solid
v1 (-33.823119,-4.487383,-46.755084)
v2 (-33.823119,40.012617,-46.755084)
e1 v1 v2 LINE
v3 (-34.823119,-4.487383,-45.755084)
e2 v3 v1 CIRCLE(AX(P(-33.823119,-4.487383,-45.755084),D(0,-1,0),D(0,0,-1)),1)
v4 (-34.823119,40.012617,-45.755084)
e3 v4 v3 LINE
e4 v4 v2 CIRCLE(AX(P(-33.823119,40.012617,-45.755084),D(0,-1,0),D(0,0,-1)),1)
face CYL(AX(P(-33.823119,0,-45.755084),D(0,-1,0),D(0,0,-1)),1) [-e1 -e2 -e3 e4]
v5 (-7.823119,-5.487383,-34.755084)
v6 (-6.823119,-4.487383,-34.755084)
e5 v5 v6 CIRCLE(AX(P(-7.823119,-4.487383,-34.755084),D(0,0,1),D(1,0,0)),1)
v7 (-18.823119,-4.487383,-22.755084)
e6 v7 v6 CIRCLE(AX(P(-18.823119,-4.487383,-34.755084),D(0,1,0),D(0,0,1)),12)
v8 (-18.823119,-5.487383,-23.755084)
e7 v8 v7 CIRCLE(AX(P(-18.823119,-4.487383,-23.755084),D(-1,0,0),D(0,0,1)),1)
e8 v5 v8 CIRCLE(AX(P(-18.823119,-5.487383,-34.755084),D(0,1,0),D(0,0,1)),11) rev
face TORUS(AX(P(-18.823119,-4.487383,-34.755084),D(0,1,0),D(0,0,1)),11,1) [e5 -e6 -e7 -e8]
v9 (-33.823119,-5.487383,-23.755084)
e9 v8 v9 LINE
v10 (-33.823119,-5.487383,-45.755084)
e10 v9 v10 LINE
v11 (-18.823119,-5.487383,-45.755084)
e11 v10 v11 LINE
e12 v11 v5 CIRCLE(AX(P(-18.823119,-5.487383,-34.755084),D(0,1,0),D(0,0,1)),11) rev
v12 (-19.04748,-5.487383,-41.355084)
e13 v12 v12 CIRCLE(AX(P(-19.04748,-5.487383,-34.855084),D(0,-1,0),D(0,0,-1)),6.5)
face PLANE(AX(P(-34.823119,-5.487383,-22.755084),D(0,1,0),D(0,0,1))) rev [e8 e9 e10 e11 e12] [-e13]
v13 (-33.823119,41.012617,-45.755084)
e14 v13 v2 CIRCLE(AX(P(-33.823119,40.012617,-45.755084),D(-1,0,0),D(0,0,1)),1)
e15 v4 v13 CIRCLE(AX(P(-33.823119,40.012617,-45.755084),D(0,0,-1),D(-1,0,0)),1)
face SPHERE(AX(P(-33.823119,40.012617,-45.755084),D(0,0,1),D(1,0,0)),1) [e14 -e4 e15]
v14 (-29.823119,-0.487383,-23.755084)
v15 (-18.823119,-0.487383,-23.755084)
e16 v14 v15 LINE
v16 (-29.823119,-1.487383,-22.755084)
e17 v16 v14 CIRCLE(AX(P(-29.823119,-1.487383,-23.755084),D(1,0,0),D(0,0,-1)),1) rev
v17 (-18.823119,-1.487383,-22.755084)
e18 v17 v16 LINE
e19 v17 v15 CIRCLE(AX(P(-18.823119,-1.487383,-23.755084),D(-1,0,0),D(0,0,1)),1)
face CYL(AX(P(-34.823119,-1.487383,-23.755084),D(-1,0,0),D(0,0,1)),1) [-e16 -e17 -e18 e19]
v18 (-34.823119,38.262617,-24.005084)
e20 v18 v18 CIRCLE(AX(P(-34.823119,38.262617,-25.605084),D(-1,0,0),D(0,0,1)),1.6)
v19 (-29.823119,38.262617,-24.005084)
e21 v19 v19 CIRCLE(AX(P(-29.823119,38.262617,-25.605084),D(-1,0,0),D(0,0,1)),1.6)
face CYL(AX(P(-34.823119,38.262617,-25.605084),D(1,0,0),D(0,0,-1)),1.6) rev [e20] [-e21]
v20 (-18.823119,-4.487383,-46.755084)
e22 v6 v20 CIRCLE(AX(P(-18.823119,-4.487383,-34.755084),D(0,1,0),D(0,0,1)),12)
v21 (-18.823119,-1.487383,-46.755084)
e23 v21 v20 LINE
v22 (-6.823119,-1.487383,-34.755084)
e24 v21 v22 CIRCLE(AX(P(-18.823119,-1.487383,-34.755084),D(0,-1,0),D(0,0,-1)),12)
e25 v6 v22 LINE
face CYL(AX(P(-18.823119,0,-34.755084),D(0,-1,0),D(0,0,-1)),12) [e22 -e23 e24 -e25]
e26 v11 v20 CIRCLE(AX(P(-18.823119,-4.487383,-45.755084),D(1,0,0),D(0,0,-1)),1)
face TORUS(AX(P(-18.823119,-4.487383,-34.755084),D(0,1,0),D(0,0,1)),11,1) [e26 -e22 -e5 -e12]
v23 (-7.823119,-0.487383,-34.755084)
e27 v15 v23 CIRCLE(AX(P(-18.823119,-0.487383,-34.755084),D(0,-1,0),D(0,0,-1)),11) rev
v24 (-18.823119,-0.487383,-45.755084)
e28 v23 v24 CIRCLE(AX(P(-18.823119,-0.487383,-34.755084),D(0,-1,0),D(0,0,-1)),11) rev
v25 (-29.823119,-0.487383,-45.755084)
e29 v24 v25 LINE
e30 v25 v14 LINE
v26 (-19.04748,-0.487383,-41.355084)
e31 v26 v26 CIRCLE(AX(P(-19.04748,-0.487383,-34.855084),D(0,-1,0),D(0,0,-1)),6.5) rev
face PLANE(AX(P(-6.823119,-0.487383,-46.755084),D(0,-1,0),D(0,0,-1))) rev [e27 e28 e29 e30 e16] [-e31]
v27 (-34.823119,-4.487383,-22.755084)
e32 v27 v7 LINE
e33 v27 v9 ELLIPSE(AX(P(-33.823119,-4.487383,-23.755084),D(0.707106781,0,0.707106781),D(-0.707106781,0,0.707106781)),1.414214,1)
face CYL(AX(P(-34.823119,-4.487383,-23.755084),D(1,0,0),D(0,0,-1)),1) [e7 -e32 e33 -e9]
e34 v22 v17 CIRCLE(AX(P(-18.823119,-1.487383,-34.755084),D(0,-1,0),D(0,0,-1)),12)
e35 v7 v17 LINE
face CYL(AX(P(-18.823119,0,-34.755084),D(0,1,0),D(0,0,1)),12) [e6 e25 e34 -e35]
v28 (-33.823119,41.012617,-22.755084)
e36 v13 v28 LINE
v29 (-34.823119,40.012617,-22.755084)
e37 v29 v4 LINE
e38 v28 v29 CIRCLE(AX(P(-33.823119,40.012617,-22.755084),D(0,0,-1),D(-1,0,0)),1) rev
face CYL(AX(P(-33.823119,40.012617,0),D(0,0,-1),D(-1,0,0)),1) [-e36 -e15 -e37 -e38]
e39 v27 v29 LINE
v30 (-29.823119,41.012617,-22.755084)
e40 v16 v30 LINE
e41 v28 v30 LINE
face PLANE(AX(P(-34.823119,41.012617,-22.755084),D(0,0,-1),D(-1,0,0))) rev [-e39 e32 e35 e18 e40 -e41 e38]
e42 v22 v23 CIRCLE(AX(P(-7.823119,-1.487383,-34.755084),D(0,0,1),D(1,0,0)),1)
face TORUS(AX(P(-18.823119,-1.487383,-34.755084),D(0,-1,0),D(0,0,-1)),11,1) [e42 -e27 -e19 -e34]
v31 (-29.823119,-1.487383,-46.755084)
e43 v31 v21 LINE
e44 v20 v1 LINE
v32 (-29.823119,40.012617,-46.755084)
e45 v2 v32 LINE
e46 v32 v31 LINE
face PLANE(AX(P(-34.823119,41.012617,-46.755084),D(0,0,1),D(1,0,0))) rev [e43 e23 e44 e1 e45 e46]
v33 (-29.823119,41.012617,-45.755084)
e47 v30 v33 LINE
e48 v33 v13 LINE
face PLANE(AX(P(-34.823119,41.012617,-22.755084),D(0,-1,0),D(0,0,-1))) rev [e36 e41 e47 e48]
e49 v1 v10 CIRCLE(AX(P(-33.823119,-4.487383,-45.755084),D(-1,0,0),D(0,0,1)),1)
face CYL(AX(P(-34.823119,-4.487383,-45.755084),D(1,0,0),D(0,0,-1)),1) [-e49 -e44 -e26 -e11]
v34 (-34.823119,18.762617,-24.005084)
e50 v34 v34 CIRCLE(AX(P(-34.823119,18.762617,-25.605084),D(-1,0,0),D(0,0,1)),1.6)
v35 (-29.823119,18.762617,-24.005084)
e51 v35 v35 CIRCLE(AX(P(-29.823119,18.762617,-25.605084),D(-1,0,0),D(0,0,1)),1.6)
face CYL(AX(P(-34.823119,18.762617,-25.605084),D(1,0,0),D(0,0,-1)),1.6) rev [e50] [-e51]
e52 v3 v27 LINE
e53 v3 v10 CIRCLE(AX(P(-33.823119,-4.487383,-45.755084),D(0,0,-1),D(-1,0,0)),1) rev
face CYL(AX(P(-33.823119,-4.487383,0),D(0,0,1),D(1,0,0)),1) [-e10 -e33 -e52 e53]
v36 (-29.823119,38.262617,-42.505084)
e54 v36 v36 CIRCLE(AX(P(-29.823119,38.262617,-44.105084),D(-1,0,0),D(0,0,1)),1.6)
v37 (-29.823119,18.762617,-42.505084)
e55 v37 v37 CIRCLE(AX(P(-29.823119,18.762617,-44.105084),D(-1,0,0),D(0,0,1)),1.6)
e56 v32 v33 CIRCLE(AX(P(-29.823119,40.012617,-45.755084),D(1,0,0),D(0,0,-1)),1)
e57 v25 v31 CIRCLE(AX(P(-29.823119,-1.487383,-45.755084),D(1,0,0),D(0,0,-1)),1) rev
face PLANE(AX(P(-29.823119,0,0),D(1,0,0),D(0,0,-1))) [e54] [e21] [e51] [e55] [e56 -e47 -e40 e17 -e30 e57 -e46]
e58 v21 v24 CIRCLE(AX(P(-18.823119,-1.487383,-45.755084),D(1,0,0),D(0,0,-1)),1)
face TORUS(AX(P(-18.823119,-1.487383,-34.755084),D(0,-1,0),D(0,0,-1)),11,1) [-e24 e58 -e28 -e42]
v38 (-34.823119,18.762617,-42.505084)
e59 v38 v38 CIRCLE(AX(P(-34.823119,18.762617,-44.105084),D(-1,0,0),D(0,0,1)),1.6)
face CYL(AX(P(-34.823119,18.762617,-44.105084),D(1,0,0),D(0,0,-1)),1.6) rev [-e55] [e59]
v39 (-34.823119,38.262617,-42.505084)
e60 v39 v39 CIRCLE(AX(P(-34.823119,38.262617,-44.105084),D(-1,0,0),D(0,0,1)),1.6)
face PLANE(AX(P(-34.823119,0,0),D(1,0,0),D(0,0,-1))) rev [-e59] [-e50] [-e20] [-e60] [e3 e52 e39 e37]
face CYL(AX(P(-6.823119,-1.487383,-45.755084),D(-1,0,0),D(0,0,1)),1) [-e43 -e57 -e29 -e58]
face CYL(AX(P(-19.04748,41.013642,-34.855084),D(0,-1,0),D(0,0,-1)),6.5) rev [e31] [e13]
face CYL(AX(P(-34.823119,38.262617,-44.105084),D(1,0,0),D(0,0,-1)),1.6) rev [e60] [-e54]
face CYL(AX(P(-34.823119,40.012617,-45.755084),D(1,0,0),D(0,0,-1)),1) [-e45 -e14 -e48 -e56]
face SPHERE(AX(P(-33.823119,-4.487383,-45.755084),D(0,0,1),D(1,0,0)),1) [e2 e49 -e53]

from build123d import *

# Parameters (mm, degrees)
CROQUIS1_W              = 24
CROQUIS1_H              = 46.5
CROQUIS1_R              = 1.6
SALIENTE_EXTRUIR1_DEPTH = 5
CROQUIS2_W              = 24
CROQUIS2_H              = 5
SALIENTE_EXTRUIR2_DEPTH = 23
CORTAR_EXTRUIR1_REACH   = 76.572
CROQUIS3_R              = 6.5
REDONDEO1_R             = 12
REDONDEO2_R             = 1
REDONDEO3_R             = 1


with BuildPart() as part:
    # Croquis1 → Saliente-Extruir1 (new body)
    with BuildSketch(Plane.ZY.offset(29.823119035)):
        with Locations((-34.755083615, 17.762616936)):
            Rectangle(CROQUIS1_W, CROQUIS1_H)
        with Locations((-44.105083615, 38.262616936)):
            Circle(CROQUIS1_R, mode=Mode.SUBTRACT)
        with Locations((-25.605083615, 38.262616936)):
            Circle(CROQUIS1_R, mode=Mode.SUBTRACT)
        with Locations((-25.605083615, 18.762616936)):
            Circle(CROQUIS1_R, mode=Mode.SUBTRACT)
        with Locations((-44.105083615, 18.762616936)):
            Circle(CROQUIS1_R, mode=Mode.SUBTRACT)
    extrude(amount=SALIENTE_EXTRUIR1_DEPTH)

    # Croquis2 → Saliente-Extruir2 (add)
    with BuildSketch(Plane(origin=(-29.823119035, 0, 0), x_dir=(0, 0, -1), z_dir=(1, 0, 0))):
        with Locations((34.755083615, -2.987383064)):
            Rectangle(CROQUIS2_W, CROQUIS2_H)
    extrude(amount=SALIENTE_EXTRUIR2_DEPTH)

    # Croquis3 → Cortar-Extruir1 (cut, up to next)
    with BuildSketch(Plane.XZ.offset(5.487383064), mode=Mode.PRIVATE) as cortar_extruir1_sk1:
        with Locations(Location((-19.047480384, -34.855083615, 0), (0, 0, 270))):
            Circle(CROQUIS3_R)
    cortar_extruir1_tool1 = extrude(cortar_extruir1_sk1.sketch, amount=-CORTAR_EXTRUIR1_REACH, mode=Mode.PRIVATE) & part.part
    add(cortar_extruir1_tool1.solids().sort_by_distance((-19.04748, -5.487383, -34.855084))[0], mode=Mode.SUBTRACT)

    # Redondeo1
    redondeo1_edges = [part.edges().sort_by_distance(p)[0] for p in [
        (-6.823119035, -2.987383064, -22.755083615),
        (-6.823119035, -2.987383064, -46.755083615),
    ]]
    fillet(redondeo1_edges, radius=REDONDEO1_R - 0.0001)  # a hair under: the kernel refuses the full size

    # Redondeo2
    redondeo2_edges = [part.edges().sort_by_distance(p)[0] for p in [
        (-26.823069035, -5.487383064, -22.755083615),
        (-10.337808371, -5.487383064, -26.269772952),
        (-10.337808371, -5.487383064, -43.240394279),
        (-24.323069035, -0.487383064, -22.755083615),
        (-10.337808371, -0.487383064, -26.269772952),
        (-10.337808371, -0.487383064, -43.240394279),
        (-34.823119035, -5.487383064, -34.755083615),
        (-34.823119035, 17.762616936, -46.755083615),
        (-26.823069035, -5.487383064, -46.755083615),
        (-24.323069035, -0.487383064, -46.755083615),
    ]]
    fillet(redondeo2_edges, radius=REDONDEO2_R)

    # Redondeo3
    redondeo3_edges = [part.edges().sort_by_distance(p)[0] for p in [
        (-31.823119035, 41.012616936, -46.755083615),
        (-34.823119035, 41.012616936, -34.255083615),
    ]]
    fillet(redondeo3_edges, radius=REDONDEO3_R)


solid = part.part
